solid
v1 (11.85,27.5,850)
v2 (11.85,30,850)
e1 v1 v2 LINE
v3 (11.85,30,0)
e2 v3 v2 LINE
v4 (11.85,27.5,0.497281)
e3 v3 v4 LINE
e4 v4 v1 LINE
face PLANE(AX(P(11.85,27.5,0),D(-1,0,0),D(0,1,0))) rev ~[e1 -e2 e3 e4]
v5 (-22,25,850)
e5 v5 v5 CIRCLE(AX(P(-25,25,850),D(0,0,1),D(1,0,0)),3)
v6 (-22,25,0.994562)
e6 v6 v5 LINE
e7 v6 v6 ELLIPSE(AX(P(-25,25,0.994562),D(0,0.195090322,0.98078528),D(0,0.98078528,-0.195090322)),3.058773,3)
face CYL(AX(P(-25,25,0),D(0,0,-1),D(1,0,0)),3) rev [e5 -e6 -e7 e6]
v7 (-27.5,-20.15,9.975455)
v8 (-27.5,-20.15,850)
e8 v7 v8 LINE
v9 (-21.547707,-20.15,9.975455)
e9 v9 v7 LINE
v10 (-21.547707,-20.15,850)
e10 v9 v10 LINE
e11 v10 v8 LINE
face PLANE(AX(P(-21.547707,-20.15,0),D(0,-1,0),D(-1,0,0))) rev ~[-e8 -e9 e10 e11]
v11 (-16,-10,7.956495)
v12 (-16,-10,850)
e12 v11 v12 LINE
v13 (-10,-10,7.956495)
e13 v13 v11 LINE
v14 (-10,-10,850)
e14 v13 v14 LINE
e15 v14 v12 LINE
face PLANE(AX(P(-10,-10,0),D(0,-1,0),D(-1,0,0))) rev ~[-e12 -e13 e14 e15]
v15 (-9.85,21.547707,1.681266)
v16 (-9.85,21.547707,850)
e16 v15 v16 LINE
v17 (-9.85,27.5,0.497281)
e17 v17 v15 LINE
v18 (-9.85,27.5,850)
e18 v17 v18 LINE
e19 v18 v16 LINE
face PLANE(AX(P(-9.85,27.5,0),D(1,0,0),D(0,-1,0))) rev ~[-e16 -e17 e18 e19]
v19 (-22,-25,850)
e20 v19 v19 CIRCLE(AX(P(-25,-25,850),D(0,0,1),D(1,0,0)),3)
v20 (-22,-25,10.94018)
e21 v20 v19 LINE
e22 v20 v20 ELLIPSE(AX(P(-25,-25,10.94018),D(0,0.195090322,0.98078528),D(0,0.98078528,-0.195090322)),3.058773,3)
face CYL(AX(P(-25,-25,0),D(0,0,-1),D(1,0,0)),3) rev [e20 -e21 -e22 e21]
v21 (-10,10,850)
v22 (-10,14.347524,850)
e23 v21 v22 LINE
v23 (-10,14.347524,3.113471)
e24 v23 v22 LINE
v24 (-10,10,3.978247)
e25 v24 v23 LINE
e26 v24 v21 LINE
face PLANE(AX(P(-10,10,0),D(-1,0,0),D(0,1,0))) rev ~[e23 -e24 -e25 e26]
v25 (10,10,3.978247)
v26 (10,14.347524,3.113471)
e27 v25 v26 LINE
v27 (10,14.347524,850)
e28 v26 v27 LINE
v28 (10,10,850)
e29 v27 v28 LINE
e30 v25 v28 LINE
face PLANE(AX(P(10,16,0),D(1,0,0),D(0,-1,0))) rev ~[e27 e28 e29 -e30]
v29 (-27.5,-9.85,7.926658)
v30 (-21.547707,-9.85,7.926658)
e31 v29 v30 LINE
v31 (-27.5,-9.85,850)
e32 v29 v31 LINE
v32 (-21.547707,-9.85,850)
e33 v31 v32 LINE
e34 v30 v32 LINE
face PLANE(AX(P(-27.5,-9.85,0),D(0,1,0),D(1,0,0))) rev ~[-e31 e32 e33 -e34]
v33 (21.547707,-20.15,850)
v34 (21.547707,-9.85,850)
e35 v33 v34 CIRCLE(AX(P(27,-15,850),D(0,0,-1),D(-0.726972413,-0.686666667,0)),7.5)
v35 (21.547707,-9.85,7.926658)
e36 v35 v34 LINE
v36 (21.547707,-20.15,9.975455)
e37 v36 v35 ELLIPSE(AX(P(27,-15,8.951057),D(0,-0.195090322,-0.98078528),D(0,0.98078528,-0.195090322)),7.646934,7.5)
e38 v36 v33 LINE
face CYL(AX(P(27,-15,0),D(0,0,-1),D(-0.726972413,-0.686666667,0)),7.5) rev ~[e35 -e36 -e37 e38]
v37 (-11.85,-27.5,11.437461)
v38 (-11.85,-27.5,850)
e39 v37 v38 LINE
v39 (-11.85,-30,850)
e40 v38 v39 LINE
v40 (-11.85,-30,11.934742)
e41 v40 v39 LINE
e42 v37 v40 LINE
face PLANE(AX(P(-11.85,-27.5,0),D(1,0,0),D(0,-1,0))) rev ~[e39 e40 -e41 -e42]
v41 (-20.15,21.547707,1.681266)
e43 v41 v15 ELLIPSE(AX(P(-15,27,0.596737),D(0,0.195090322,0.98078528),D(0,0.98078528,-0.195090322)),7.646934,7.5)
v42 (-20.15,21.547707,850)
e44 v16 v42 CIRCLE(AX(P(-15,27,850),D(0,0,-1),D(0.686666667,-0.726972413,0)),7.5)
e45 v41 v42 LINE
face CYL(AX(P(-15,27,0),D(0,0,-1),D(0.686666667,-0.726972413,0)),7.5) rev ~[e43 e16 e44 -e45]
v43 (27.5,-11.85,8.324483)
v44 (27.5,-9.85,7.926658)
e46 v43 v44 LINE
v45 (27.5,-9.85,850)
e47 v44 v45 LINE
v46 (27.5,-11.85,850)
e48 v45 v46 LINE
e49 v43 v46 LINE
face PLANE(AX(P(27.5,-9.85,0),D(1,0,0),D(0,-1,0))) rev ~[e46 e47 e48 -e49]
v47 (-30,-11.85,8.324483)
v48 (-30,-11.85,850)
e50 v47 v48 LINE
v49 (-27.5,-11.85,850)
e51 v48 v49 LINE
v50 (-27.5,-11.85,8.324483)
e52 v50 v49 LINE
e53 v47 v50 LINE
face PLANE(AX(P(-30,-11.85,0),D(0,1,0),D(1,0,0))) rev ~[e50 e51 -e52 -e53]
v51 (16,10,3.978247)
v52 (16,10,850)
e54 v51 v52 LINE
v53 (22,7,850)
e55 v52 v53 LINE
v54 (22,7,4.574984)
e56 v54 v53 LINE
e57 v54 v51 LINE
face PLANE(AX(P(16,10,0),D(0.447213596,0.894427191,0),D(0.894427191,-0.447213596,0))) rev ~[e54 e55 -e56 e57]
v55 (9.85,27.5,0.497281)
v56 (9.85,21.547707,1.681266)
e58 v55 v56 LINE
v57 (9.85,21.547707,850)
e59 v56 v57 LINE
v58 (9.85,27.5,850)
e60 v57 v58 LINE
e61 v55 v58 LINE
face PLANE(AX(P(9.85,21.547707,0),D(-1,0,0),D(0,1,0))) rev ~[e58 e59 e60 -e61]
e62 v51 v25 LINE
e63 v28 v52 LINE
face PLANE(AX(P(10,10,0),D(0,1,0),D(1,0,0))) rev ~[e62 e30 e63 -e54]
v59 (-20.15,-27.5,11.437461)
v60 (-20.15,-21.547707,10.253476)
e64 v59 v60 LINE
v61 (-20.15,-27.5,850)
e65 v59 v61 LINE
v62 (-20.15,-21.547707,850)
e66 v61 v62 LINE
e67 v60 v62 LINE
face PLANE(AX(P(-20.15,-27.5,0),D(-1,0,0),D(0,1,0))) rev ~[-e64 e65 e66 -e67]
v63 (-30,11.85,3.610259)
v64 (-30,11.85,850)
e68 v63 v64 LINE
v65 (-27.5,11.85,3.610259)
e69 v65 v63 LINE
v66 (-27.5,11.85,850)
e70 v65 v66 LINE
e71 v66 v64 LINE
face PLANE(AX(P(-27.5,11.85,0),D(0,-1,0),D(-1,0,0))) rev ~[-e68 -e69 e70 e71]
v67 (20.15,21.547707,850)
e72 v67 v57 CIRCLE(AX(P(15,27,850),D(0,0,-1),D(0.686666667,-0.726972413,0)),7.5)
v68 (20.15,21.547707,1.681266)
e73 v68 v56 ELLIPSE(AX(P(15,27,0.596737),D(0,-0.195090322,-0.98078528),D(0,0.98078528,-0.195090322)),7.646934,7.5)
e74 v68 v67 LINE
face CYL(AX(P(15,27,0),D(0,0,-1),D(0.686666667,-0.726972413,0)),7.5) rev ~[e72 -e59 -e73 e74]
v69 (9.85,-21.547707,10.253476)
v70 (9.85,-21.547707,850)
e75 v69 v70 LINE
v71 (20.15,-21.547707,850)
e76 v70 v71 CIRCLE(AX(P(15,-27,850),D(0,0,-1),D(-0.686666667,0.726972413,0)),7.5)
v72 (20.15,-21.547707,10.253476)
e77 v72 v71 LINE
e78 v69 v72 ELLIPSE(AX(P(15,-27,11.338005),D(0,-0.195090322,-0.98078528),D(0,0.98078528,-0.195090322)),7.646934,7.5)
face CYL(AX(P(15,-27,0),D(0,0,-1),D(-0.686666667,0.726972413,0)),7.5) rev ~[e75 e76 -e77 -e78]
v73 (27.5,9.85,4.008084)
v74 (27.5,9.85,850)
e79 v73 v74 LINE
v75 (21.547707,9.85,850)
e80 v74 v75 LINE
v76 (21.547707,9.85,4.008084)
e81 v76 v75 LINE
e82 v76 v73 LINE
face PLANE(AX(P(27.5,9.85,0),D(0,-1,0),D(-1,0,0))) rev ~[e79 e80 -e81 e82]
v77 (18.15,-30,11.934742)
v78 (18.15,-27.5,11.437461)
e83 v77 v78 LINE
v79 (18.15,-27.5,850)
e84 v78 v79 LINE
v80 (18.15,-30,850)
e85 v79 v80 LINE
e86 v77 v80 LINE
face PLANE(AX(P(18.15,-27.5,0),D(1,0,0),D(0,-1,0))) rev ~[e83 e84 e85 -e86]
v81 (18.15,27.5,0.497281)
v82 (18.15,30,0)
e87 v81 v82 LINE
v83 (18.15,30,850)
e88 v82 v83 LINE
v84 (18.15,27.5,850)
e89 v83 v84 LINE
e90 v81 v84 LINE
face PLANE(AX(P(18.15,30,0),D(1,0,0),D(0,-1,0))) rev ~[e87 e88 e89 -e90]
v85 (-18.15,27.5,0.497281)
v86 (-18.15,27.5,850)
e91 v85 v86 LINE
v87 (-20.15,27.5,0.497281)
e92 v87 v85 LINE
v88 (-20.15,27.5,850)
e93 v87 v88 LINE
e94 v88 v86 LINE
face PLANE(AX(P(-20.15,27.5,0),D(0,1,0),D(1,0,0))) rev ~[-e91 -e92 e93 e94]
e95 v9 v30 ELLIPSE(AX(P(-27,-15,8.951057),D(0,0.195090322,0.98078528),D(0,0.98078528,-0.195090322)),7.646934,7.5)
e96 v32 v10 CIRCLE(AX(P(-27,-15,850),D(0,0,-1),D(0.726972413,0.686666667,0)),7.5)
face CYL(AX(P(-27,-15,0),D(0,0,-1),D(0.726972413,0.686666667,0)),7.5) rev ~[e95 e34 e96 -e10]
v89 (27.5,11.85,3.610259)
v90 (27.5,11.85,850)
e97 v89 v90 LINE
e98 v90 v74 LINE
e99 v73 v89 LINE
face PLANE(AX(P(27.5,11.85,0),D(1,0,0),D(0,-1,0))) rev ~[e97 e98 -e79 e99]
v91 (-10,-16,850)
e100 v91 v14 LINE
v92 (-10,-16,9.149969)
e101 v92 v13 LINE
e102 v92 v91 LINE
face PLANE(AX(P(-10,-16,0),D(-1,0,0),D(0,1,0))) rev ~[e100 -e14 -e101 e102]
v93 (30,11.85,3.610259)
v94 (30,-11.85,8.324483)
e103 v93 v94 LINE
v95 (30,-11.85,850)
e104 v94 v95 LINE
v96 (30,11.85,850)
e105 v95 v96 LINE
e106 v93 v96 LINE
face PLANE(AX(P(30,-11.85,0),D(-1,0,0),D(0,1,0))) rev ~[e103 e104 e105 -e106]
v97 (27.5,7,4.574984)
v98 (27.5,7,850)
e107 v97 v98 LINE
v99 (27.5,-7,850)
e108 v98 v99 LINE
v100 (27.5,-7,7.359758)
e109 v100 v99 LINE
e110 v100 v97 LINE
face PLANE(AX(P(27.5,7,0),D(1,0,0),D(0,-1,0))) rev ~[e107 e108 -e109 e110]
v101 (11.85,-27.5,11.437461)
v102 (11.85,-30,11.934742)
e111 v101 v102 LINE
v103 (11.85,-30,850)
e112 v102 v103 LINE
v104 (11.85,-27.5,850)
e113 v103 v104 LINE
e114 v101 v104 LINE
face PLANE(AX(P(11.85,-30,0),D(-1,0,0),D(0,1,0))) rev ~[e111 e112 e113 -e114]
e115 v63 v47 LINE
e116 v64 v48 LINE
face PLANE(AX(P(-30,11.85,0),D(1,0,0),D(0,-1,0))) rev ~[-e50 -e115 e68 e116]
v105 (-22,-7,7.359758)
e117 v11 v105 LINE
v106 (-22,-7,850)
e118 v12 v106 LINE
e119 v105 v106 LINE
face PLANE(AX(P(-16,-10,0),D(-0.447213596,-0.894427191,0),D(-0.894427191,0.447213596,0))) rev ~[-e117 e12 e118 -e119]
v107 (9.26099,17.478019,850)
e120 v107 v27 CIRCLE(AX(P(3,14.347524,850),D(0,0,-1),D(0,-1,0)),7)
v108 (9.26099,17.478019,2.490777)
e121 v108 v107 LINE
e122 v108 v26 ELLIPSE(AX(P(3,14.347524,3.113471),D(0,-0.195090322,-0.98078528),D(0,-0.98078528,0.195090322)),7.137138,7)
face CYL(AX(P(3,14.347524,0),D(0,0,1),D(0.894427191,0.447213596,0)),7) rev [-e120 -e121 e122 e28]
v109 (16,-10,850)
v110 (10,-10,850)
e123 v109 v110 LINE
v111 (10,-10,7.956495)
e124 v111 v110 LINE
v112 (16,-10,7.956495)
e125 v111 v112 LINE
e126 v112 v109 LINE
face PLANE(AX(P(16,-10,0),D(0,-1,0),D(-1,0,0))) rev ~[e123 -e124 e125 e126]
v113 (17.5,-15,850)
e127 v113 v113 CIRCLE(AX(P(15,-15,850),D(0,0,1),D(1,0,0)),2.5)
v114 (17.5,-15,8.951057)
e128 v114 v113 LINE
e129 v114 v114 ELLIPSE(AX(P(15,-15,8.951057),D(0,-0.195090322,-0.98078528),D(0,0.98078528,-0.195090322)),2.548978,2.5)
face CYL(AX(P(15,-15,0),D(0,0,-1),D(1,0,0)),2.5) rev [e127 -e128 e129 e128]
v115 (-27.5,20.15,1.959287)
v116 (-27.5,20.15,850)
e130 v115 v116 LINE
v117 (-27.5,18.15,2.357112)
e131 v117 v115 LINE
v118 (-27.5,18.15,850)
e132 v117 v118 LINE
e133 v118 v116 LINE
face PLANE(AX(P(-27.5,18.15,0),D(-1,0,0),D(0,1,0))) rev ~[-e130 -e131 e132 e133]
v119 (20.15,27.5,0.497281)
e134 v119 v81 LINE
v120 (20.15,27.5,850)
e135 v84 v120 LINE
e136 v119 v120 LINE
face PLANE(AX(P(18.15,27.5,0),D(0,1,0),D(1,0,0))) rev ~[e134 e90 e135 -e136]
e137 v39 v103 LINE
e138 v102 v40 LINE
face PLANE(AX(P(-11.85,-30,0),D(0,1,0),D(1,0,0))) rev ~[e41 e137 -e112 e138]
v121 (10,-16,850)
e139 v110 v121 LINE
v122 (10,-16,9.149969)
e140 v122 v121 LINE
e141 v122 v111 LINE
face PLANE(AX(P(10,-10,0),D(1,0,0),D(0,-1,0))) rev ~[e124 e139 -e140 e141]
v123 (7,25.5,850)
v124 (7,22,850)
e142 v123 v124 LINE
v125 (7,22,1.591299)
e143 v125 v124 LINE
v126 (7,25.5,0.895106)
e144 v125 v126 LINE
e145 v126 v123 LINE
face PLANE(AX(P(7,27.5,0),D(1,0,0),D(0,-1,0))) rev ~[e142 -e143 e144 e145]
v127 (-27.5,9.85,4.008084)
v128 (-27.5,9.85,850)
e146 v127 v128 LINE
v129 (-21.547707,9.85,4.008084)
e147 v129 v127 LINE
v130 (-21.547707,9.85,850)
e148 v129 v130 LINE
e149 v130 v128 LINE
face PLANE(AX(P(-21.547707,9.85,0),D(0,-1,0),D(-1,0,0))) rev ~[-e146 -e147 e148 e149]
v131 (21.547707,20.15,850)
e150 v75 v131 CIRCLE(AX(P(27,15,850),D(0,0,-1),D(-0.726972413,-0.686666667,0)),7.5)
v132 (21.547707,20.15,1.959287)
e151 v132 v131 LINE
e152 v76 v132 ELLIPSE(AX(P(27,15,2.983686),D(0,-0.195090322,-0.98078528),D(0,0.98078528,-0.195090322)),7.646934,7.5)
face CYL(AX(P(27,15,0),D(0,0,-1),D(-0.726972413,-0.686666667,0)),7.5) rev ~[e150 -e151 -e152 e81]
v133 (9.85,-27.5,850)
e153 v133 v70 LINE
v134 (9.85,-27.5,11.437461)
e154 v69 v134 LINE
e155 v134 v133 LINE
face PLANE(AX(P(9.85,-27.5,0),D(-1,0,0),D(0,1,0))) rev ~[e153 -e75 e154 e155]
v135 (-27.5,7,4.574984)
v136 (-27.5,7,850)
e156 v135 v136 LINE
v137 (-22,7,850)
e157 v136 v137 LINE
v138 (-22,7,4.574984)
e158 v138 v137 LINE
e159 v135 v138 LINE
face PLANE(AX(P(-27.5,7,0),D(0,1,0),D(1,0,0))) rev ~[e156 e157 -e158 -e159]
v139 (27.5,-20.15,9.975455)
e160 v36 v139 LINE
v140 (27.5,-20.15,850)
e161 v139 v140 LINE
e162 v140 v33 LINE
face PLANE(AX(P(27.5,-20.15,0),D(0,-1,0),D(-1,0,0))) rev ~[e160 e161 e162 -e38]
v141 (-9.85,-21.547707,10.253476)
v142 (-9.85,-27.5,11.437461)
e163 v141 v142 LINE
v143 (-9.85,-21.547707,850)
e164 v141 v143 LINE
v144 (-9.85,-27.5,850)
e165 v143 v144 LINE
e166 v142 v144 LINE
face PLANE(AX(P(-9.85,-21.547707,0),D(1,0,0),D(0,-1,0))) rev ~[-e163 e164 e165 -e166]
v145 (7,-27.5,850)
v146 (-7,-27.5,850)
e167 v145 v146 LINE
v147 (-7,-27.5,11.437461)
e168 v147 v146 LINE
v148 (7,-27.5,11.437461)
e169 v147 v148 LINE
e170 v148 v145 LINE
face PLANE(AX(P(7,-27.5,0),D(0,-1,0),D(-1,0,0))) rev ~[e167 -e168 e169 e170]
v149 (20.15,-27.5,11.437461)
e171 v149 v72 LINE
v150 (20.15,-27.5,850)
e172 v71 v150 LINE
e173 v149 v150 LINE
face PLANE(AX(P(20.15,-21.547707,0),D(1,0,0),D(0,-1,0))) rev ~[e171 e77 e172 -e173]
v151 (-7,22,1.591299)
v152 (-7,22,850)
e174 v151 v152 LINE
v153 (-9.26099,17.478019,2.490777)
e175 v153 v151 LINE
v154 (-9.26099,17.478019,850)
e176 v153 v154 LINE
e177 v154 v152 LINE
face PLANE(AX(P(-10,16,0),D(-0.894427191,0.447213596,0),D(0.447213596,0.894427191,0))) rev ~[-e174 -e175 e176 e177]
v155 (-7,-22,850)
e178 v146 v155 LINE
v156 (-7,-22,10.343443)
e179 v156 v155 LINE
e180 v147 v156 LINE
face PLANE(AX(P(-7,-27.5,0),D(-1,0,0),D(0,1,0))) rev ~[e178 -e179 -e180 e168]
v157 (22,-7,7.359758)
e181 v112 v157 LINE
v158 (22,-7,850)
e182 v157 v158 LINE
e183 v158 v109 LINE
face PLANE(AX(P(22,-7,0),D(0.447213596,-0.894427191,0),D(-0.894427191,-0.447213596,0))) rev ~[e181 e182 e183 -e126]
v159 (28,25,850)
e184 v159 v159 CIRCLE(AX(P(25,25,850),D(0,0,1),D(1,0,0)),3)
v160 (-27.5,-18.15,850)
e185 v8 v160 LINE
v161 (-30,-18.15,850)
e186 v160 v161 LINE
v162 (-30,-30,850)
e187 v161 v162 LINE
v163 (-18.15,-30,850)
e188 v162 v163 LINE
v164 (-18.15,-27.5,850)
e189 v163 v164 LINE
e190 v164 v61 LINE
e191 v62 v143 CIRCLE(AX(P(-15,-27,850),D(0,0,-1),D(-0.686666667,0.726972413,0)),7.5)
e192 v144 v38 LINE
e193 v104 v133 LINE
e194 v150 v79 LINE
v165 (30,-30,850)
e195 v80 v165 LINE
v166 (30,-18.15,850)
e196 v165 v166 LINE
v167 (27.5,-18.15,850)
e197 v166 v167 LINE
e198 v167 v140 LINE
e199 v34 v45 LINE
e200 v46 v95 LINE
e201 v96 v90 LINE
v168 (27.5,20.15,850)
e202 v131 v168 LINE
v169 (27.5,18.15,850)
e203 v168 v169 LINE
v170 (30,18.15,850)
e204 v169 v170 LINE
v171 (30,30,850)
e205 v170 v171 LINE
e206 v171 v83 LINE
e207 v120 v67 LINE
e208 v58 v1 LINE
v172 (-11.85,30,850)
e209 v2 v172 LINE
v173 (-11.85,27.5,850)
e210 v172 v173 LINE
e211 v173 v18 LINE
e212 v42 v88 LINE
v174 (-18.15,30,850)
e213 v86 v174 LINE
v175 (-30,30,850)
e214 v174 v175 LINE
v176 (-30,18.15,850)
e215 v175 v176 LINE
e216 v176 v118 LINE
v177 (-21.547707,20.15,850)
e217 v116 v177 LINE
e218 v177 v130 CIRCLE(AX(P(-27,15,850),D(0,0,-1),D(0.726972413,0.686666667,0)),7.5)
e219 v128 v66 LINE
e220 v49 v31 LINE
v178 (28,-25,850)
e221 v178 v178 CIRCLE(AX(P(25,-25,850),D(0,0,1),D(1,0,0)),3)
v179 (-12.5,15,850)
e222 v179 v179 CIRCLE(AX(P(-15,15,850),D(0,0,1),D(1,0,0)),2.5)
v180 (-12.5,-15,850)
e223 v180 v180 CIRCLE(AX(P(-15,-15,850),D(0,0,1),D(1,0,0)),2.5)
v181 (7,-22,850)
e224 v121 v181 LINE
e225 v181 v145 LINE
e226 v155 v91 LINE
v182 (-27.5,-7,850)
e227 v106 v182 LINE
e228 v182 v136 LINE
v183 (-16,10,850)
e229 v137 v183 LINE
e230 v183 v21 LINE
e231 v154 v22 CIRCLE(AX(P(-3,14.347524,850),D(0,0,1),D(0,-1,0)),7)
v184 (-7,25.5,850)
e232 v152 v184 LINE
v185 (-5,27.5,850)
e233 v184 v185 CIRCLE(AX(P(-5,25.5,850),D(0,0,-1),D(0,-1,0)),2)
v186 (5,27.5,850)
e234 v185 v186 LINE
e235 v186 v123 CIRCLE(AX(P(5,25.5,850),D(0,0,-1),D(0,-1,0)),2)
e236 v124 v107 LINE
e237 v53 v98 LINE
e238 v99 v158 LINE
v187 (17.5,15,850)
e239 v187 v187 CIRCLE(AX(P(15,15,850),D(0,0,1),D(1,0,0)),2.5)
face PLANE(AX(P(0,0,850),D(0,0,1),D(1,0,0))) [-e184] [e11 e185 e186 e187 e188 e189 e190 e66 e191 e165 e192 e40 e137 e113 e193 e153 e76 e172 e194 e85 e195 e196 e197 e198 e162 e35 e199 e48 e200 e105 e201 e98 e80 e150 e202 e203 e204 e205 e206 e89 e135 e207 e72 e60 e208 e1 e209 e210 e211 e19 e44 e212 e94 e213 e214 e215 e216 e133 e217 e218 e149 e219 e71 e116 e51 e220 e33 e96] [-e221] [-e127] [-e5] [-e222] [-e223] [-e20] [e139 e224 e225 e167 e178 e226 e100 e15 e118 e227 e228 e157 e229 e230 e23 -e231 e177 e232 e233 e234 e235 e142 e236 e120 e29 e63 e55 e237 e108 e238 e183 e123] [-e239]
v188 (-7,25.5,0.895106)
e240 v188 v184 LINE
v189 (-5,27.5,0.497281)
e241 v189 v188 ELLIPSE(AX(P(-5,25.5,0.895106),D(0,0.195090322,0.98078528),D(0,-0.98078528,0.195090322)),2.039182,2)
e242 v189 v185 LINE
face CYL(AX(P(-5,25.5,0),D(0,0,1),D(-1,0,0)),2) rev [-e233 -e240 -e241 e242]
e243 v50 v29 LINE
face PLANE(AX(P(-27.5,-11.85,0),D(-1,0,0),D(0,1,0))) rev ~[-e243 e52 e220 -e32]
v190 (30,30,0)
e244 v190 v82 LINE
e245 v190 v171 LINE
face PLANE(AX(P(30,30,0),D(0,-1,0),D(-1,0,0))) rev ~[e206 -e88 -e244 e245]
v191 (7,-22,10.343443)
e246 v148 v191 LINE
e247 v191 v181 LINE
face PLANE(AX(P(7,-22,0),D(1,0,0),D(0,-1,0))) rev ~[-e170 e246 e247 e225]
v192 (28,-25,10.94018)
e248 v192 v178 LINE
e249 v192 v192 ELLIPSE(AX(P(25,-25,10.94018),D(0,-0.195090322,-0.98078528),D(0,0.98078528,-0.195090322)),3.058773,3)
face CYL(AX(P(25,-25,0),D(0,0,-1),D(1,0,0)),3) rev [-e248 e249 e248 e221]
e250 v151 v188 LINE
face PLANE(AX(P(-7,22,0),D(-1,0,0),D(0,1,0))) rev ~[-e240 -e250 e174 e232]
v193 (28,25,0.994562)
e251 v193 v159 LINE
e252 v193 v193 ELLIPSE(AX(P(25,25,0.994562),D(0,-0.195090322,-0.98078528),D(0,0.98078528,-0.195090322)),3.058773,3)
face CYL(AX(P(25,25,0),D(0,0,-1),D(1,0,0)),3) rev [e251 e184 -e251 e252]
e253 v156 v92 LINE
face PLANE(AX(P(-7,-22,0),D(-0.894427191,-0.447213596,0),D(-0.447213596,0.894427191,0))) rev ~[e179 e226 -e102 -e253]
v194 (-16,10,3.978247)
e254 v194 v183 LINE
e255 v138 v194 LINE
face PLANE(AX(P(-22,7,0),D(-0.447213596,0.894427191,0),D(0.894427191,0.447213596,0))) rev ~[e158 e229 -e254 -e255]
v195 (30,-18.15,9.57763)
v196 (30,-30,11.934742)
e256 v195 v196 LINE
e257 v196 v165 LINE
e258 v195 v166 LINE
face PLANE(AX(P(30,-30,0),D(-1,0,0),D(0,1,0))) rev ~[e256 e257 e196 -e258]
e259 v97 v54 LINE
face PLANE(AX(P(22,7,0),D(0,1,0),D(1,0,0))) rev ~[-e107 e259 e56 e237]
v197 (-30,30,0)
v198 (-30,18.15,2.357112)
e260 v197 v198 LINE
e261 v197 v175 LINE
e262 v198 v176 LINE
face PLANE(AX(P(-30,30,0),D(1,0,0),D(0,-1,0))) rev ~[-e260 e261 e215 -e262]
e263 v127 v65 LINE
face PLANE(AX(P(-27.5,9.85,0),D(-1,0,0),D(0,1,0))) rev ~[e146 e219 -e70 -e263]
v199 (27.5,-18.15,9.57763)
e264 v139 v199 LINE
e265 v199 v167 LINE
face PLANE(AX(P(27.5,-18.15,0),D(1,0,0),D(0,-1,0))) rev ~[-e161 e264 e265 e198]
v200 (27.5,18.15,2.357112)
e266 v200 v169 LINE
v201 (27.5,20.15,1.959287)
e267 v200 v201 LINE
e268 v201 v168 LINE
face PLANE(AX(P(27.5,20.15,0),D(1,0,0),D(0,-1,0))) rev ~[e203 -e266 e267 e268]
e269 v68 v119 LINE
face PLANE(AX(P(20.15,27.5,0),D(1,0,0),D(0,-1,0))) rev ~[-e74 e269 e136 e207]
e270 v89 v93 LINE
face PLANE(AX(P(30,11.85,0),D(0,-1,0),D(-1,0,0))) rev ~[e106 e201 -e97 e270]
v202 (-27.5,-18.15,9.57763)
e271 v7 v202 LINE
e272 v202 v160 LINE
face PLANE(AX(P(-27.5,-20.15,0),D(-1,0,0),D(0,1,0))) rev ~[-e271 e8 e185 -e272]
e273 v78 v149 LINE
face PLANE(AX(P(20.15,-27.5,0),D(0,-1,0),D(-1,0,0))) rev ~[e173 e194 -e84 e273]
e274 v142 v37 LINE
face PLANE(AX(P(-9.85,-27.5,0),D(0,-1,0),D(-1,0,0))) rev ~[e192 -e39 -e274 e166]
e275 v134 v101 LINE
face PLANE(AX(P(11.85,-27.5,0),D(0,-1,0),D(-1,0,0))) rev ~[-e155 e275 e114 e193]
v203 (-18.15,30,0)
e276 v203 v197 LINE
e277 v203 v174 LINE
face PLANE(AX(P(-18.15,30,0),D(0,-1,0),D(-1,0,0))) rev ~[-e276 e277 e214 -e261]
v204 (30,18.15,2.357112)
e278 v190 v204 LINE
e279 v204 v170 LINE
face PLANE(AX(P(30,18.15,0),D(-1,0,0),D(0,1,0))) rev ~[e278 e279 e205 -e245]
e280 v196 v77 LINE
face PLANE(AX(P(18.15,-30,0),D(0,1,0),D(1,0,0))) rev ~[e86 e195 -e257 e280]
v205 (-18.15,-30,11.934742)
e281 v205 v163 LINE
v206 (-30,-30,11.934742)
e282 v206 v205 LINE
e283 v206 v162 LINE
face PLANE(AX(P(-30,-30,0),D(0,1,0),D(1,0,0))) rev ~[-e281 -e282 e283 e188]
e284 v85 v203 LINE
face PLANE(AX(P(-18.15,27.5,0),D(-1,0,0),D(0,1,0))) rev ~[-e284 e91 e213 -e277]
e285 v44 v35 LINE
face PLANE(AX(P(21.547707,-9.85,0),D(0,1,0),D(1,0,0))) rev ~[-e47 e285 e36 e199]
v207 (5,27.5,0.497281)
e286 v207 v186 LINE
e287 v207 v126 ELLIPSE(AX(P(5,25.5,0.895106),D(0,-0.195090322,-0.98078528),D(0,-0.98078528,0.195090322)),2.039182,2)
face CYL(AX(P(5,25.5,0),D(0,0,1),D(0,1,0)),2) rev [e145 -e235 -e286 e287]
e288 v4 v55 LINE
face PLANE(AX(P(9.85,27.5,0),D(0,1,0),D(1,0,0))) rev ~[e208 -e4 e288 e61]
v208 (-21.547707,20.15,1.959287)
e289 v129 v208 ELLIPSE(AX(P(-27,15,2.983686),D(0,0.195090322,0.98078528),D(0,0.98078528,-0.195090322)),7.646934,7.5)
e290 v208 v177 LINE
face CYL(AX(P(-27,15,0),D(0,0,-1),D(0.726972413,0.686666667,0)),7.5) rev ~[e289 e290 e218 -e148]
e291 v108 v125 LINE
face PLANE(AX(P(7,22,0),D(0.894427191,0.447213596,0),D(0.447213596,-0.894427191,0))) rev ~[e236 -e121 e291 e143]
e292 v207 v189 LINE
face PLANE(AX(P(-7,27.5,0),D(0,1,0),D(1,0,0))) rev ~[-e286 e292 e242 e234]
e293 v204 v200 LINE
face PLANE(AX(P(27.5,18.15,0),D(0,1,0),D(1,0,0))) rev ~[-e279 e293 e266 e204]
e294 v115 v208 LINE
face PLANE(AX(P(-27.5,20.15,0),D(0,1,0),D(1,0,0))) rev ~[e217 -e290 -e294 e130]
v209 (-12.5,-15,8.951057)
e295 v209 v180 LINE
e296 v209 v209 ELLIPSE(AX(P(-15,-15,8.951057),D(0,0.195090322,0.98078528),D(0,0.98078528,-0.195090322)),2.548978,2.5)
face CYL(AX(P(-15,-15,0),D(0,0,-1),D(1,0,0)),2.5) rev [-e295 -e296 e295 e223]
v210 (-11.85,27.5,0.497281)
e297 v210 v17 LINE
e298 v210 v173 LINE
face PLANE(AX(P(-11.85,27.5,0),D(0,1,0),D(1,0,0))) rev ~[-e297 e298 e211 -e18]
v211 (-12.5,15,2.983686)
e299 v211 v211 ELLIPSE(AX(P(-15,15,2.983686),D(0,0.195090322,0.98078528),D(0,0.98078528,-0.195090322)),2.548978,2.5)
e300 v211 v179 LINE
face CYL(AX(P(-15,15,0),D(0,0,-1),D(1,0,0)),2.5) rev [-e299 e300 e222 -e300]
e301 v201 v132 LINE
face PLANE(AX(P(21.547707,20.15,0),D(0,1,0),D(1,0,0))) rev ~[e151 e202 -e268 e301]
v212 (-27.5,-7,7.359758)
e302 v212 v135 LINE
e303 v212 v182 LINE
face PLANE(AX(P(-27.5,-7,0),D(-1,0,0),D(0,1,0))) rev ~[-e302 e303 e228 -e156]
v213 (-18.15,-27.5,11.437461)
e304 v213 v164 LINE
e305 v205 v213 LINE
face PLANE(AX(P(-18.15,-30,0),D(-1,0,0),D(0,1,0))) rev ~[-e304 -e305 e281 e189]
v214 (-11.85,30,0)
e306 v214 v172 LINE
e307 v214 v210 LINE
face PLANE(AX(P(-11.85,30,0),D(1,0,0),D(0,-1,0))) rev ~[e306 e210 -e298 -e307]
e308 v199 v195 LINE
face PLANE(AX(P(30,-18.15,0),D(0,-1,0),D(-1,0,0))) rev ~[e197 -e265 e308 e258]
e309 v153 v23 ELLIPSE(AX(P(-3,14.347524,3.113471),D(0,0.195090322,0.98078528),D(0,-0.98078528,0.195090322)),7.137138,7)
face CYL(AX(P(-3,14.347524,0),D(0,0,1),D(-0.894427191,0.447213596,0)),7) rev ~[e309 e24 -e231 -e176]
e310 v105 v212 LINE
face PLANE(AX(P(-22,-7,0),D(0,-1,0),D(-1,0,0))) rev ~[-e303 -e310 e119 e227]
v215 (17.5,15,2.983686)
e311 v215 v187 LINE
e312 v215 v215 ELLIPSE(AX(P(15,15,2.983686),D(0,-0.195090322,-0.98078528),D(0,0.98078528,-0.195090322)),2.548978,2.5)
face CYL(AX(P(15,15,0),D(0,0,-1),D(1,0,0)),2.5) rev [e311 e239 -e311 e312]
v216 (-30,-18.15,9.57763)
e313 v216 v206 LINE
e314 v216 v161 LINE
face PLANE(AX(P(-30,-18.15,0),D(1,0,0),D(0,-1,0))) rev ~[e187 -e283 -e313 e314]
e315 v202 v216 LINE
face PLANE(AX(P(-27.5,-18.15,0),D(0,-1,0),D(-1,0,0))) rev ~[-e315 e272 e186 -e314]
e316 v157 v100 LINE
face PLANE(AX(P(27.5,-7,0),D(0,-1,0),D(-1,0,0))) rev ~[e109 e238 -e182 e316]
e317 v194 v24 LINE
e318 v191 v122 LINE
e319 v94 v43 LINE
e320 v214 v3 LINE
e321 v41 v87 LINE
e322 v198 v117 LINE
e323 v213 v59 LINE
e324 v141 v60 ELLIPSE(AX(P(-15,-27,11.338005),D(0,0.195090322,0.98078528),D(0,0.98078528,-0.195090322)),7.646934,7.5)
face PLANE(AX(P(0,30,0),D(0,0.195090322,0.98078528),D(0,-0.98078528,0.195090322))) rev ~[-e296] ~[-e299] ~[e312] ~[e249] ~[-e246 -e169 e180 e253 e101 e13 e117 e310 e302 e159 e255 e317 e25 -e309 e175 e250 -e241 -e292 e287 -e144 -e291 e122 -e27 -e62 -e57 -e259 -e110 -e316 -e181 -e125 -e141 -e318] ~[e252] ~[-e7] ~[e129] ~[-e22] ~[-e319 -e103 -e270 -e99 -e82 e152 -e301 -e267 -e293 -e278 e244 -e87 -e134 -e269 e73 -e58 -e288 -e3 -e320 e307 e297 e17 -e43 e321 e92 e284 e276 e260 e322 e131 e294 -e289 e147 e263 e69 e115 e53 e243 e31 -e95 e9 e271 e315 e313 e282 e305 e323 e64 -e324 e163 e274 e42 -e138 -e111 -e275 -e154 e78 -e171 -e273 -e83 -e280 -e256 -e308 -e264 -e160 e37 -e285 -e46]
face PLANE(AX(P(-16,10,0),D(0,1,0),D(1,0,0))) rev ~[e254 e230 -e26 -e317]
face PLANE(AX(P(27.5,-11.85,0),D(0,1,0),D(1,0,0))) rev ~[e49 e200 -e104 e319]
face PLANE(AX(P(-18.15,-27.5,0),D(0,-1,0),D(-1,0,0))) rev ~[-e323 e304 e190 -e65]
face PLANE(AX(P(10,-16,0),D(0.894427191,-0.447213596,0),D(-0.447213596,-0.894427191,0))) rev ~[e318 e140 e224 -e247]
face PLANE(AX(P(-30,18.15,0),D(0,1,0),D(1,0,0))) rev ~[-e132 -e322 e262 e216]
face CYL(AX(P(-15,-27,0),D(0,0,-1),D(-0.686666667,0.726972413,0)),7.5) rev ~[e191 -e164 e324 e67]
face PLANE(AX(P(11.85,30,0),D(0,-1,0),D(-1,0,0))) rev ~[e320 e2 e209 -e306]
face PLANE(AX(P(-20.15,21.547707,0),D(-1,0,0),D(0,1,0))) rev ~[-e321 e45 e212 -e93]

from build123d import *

# Parameters (mm, degrees)
F0_R          = 3
F0_R_2        = 2.5
F1_DEPTH      = 850
F2_R          = 2
F3_R          = 7
F5_DEPTH      = 30
F5_DEPTH_BACK = 30


# Not quite as in the source:
# - a feature names something its author has since deleted; it is built from what else it names


with BuildPart() as f1:
    # F0 (on Top) → F1 (new body)
    with BuildSketch(Plane.XY):
        with BuildLine():
            Line((18.15, -30), (30, -30))
            Line((30, -30), (30, -18.15))
            Line((30, -18.15), (27.5, -18.15))
            Line((27.5, -18.15), (27.5, -20.15))
            Line((27.5, -20.15), (21.5477069044, -20.15))
            ThreePointArc((21.5477069044, -20.15), (19.5, -15), (21.5477069044, -9.85))
            Line((21.5477069044, -9.85), (27.5, -9.85))
            Line((27.5, -9.85), (27.5, -11.85))
            Line((27.5, -11.85), (30, -11.85))
            Line((30, -11.85), (30, 11.85))
            Line((30, 11.85), (27.5, 11.85))
            Line((27.5, 11.85), (27.5, 9.85))
            Line((27.5, 9.85), (21.5477069044, 9.85))
            ThreePointArc((21.5477069044, 9.85), (19.5, 15), (21.5477069044, 20.15))
            Line((21.5477069044, 20.15), (27.5, 20.15))
            Line((27.5, 20.15), (27.5, 18.15))
            Line((27.5, 18.15), (30, 18.15))
            Line((30, 18.15), (30, 30))
            Line((30, 30), (18.15, 30))
            Line((18.15, 30), (18.15, 27.5))
            Line((18.15, 27.5), (20.15, 27.5))
            Line((20.15, 27.5), (20.15, 21.5477069044))
            ThreePointArc((20.15, 21.5477069044), (15, 19.5), (9.85, 21.5477069044))
            Line((9.85, 21.5477069044), (9.85, 27.5))
            Line((9.85, 27.5), (11.85, 27.5))
            Line((11.85, 27.5), (11.85, 30))
            Line((11.85, 30), (-11.85, 30))
            Line((-11.85, 30), (-11.85, 27.5))
            Line((-11.85, 27.5), (-9.85, 27.5))
            Line((-9.85, 27.5), (-9.85, 21.5477069044))
            ThreePointArc((-9.85, 21.5477069044), (-15, 19.5), (-20.15, 21.5477069044))
            Line((-20.15, 21.5477069044), (-20.15, 27.5))
            Line((-20.15, 27.5), (-18.15, 27.5))
            Line((-18.15, 27.5), (-18.15, 30))
            Line((-18.15, 30), (-30, 30))
            Line((-30, 30), (-30, 18.15))
            Line((-30, 18.15), (-27.5, 18.15))
            Line((-27.5, 18.15), (-27.5, 20.15))
            Line((-27.5, 20.15), (-21.5477069044, 20.15))
            ThreePointArc((-21.5477069044, 20.15), (-19.5, 15), (-21.5477069044, 9.85))
            Line((-21.5477069044, 9.85), (-27.5, 9.85))
            Line((-27.5, 9.85), (-27.5, 11.85))
            Line((-27.5, 11.85), (-30, 11.85))
            Line((-30, 11.85), (-30, -11.85))
            Line((-30, -11.85), (-27.5, -11.85))
            Line((-27.5, -11.85), (-27.5, -9.85))
            Line((-27.5, -9.85), (-21.5477069044, -9.85))
            ThreePointArc((-21.5477069044, -9.85), (-19.5, -15), (-21.5477069044, -20.15))
            Line((-21.5477069044, -20.15), (-27.5, -20.15))
            Line((-27.5, -20.15), (-27.5, -18.15))
            Line((-27.5, -18.15), (-30, -18.15))
            Line((-30, -18.15), (-30, -30))
            Line((-30, -30), (-18.15, -30))
            Line((-18.15, -30), (-18.15, -27.5))
            Line((-18.15, -27.5), (-20.15, -27.5))
            Line((-20.15, -27.5), (-20.15, -21.5477069044))
            ThreePointArc((-20.15, -21.5477069044), (-15, -19.5), (-9.85, -21.5477069044))
            Line((-9.85, -21.5477069044), (-9.85, -27.5))
            Line((-9.85, -27.5), (-11.85, -27.5))
            Line((-11.85, -27.5), (-11.85, -30))
            Line((-11.85, -30), (11.85, -30))
            Line((11.85, -30), (11.85, -27.5))
            Line((11.85, -27.5), (9.85, -27.5))
            Line((9.85, -27.5), (9.85, -21.5477069044))
            ThreePointArc((9.85, -21.5477069044), (15, -19.5), (20.15, -21.5477069044))
            Line((20.15, -21.5477069044), (20.15, -27.5))
            Line((20.15, -27.5), (18.15, -27.5))
            Line((18.15, -27.5), (18.15, -30))
        make_face()
        with Locations((-25, -25)):
            Circle(F0_R, mode=Mode.SUBTRACT)
        with Locations((-15, -15)):
            Circle(F0_R_2, mode=Mode.SUBTRACT)
        with Locations((25, -25)):
            Circle(F0_R, mode=Mode.SUBTRACT)
        with Locations((15, -15)):
            Circle(F0_R_2, mode=Mode.SUBTRACT)
        with Locations((-25, 25)):
            Circle(F0_R, mode=Mode.SUBTRACT)
        with Locations((-15, 15)):
            Circle(F0_R_2, mode=Mode.SUBTRACT)
        Polygon((-7, 22), (-7, 27.5), (0, 27.5), (7, 27.5), (7, 22), (10, 16), (10, 10), (16, 10), (22, 7), (27.5, 7), (27.5, 0), (27.5, -7), (22, -7), (16, -10), (10, -10), (10, -16), (7, -22), (7, -27.5), (0, -27.5), (-7, -27.5), (-7, -22), (-10, -16), (-10, -10), (-16, -10), (-22, -7), (-27.5, -7), (-27.5, 0), (-27.5, 7), (-22, 7), (-16, 10), (-10, 10), (-10, 16), align=None, mode=Mode.SUBTRACT)
        with Locations((15, 15)):
            Circle(F0_R_2, mode=Mode.SUBTRACT)
        with Locations((25, 25)):
            Circle(F0_R, mode=Mode.SUBTRACT)
    extrude(amount=F1_DEPTH)

    # F2
    f2_edges = [f1.edges().sort_by_distance(p)[0] for p in [
        (-7, 27.5, 425),
        (7, 27.5, 425),
    ]]
    fillet(f2_edges, radius=F2_R)

    # F3
    f3_edges = [f1.edges().sort_by_distance(p)[0] for p in [
        (-10, 16, 425),
        (10, 16, 425),
    ]]
    fillet(f3_edges, radius=F3_R)

    # F4 (on Right) → F5 (cut, two sides)
    with BuildSketch(Plane.YZ) as f5_sk:
        Polygon((-164.2855995683, 38.6458085579), (-188.5911429791, -83.5464097089), (5.6944565892, -122.1922182668), (30, 0), align=None)
    extrude(amount=F5_DEPTH, mode=Mode.SUBTRACT)
    extrude(f5_sk.sketch, amount=-F5_DEPTH_BACK, mode=Mode.SUBTRACT)


solid = f1.part
